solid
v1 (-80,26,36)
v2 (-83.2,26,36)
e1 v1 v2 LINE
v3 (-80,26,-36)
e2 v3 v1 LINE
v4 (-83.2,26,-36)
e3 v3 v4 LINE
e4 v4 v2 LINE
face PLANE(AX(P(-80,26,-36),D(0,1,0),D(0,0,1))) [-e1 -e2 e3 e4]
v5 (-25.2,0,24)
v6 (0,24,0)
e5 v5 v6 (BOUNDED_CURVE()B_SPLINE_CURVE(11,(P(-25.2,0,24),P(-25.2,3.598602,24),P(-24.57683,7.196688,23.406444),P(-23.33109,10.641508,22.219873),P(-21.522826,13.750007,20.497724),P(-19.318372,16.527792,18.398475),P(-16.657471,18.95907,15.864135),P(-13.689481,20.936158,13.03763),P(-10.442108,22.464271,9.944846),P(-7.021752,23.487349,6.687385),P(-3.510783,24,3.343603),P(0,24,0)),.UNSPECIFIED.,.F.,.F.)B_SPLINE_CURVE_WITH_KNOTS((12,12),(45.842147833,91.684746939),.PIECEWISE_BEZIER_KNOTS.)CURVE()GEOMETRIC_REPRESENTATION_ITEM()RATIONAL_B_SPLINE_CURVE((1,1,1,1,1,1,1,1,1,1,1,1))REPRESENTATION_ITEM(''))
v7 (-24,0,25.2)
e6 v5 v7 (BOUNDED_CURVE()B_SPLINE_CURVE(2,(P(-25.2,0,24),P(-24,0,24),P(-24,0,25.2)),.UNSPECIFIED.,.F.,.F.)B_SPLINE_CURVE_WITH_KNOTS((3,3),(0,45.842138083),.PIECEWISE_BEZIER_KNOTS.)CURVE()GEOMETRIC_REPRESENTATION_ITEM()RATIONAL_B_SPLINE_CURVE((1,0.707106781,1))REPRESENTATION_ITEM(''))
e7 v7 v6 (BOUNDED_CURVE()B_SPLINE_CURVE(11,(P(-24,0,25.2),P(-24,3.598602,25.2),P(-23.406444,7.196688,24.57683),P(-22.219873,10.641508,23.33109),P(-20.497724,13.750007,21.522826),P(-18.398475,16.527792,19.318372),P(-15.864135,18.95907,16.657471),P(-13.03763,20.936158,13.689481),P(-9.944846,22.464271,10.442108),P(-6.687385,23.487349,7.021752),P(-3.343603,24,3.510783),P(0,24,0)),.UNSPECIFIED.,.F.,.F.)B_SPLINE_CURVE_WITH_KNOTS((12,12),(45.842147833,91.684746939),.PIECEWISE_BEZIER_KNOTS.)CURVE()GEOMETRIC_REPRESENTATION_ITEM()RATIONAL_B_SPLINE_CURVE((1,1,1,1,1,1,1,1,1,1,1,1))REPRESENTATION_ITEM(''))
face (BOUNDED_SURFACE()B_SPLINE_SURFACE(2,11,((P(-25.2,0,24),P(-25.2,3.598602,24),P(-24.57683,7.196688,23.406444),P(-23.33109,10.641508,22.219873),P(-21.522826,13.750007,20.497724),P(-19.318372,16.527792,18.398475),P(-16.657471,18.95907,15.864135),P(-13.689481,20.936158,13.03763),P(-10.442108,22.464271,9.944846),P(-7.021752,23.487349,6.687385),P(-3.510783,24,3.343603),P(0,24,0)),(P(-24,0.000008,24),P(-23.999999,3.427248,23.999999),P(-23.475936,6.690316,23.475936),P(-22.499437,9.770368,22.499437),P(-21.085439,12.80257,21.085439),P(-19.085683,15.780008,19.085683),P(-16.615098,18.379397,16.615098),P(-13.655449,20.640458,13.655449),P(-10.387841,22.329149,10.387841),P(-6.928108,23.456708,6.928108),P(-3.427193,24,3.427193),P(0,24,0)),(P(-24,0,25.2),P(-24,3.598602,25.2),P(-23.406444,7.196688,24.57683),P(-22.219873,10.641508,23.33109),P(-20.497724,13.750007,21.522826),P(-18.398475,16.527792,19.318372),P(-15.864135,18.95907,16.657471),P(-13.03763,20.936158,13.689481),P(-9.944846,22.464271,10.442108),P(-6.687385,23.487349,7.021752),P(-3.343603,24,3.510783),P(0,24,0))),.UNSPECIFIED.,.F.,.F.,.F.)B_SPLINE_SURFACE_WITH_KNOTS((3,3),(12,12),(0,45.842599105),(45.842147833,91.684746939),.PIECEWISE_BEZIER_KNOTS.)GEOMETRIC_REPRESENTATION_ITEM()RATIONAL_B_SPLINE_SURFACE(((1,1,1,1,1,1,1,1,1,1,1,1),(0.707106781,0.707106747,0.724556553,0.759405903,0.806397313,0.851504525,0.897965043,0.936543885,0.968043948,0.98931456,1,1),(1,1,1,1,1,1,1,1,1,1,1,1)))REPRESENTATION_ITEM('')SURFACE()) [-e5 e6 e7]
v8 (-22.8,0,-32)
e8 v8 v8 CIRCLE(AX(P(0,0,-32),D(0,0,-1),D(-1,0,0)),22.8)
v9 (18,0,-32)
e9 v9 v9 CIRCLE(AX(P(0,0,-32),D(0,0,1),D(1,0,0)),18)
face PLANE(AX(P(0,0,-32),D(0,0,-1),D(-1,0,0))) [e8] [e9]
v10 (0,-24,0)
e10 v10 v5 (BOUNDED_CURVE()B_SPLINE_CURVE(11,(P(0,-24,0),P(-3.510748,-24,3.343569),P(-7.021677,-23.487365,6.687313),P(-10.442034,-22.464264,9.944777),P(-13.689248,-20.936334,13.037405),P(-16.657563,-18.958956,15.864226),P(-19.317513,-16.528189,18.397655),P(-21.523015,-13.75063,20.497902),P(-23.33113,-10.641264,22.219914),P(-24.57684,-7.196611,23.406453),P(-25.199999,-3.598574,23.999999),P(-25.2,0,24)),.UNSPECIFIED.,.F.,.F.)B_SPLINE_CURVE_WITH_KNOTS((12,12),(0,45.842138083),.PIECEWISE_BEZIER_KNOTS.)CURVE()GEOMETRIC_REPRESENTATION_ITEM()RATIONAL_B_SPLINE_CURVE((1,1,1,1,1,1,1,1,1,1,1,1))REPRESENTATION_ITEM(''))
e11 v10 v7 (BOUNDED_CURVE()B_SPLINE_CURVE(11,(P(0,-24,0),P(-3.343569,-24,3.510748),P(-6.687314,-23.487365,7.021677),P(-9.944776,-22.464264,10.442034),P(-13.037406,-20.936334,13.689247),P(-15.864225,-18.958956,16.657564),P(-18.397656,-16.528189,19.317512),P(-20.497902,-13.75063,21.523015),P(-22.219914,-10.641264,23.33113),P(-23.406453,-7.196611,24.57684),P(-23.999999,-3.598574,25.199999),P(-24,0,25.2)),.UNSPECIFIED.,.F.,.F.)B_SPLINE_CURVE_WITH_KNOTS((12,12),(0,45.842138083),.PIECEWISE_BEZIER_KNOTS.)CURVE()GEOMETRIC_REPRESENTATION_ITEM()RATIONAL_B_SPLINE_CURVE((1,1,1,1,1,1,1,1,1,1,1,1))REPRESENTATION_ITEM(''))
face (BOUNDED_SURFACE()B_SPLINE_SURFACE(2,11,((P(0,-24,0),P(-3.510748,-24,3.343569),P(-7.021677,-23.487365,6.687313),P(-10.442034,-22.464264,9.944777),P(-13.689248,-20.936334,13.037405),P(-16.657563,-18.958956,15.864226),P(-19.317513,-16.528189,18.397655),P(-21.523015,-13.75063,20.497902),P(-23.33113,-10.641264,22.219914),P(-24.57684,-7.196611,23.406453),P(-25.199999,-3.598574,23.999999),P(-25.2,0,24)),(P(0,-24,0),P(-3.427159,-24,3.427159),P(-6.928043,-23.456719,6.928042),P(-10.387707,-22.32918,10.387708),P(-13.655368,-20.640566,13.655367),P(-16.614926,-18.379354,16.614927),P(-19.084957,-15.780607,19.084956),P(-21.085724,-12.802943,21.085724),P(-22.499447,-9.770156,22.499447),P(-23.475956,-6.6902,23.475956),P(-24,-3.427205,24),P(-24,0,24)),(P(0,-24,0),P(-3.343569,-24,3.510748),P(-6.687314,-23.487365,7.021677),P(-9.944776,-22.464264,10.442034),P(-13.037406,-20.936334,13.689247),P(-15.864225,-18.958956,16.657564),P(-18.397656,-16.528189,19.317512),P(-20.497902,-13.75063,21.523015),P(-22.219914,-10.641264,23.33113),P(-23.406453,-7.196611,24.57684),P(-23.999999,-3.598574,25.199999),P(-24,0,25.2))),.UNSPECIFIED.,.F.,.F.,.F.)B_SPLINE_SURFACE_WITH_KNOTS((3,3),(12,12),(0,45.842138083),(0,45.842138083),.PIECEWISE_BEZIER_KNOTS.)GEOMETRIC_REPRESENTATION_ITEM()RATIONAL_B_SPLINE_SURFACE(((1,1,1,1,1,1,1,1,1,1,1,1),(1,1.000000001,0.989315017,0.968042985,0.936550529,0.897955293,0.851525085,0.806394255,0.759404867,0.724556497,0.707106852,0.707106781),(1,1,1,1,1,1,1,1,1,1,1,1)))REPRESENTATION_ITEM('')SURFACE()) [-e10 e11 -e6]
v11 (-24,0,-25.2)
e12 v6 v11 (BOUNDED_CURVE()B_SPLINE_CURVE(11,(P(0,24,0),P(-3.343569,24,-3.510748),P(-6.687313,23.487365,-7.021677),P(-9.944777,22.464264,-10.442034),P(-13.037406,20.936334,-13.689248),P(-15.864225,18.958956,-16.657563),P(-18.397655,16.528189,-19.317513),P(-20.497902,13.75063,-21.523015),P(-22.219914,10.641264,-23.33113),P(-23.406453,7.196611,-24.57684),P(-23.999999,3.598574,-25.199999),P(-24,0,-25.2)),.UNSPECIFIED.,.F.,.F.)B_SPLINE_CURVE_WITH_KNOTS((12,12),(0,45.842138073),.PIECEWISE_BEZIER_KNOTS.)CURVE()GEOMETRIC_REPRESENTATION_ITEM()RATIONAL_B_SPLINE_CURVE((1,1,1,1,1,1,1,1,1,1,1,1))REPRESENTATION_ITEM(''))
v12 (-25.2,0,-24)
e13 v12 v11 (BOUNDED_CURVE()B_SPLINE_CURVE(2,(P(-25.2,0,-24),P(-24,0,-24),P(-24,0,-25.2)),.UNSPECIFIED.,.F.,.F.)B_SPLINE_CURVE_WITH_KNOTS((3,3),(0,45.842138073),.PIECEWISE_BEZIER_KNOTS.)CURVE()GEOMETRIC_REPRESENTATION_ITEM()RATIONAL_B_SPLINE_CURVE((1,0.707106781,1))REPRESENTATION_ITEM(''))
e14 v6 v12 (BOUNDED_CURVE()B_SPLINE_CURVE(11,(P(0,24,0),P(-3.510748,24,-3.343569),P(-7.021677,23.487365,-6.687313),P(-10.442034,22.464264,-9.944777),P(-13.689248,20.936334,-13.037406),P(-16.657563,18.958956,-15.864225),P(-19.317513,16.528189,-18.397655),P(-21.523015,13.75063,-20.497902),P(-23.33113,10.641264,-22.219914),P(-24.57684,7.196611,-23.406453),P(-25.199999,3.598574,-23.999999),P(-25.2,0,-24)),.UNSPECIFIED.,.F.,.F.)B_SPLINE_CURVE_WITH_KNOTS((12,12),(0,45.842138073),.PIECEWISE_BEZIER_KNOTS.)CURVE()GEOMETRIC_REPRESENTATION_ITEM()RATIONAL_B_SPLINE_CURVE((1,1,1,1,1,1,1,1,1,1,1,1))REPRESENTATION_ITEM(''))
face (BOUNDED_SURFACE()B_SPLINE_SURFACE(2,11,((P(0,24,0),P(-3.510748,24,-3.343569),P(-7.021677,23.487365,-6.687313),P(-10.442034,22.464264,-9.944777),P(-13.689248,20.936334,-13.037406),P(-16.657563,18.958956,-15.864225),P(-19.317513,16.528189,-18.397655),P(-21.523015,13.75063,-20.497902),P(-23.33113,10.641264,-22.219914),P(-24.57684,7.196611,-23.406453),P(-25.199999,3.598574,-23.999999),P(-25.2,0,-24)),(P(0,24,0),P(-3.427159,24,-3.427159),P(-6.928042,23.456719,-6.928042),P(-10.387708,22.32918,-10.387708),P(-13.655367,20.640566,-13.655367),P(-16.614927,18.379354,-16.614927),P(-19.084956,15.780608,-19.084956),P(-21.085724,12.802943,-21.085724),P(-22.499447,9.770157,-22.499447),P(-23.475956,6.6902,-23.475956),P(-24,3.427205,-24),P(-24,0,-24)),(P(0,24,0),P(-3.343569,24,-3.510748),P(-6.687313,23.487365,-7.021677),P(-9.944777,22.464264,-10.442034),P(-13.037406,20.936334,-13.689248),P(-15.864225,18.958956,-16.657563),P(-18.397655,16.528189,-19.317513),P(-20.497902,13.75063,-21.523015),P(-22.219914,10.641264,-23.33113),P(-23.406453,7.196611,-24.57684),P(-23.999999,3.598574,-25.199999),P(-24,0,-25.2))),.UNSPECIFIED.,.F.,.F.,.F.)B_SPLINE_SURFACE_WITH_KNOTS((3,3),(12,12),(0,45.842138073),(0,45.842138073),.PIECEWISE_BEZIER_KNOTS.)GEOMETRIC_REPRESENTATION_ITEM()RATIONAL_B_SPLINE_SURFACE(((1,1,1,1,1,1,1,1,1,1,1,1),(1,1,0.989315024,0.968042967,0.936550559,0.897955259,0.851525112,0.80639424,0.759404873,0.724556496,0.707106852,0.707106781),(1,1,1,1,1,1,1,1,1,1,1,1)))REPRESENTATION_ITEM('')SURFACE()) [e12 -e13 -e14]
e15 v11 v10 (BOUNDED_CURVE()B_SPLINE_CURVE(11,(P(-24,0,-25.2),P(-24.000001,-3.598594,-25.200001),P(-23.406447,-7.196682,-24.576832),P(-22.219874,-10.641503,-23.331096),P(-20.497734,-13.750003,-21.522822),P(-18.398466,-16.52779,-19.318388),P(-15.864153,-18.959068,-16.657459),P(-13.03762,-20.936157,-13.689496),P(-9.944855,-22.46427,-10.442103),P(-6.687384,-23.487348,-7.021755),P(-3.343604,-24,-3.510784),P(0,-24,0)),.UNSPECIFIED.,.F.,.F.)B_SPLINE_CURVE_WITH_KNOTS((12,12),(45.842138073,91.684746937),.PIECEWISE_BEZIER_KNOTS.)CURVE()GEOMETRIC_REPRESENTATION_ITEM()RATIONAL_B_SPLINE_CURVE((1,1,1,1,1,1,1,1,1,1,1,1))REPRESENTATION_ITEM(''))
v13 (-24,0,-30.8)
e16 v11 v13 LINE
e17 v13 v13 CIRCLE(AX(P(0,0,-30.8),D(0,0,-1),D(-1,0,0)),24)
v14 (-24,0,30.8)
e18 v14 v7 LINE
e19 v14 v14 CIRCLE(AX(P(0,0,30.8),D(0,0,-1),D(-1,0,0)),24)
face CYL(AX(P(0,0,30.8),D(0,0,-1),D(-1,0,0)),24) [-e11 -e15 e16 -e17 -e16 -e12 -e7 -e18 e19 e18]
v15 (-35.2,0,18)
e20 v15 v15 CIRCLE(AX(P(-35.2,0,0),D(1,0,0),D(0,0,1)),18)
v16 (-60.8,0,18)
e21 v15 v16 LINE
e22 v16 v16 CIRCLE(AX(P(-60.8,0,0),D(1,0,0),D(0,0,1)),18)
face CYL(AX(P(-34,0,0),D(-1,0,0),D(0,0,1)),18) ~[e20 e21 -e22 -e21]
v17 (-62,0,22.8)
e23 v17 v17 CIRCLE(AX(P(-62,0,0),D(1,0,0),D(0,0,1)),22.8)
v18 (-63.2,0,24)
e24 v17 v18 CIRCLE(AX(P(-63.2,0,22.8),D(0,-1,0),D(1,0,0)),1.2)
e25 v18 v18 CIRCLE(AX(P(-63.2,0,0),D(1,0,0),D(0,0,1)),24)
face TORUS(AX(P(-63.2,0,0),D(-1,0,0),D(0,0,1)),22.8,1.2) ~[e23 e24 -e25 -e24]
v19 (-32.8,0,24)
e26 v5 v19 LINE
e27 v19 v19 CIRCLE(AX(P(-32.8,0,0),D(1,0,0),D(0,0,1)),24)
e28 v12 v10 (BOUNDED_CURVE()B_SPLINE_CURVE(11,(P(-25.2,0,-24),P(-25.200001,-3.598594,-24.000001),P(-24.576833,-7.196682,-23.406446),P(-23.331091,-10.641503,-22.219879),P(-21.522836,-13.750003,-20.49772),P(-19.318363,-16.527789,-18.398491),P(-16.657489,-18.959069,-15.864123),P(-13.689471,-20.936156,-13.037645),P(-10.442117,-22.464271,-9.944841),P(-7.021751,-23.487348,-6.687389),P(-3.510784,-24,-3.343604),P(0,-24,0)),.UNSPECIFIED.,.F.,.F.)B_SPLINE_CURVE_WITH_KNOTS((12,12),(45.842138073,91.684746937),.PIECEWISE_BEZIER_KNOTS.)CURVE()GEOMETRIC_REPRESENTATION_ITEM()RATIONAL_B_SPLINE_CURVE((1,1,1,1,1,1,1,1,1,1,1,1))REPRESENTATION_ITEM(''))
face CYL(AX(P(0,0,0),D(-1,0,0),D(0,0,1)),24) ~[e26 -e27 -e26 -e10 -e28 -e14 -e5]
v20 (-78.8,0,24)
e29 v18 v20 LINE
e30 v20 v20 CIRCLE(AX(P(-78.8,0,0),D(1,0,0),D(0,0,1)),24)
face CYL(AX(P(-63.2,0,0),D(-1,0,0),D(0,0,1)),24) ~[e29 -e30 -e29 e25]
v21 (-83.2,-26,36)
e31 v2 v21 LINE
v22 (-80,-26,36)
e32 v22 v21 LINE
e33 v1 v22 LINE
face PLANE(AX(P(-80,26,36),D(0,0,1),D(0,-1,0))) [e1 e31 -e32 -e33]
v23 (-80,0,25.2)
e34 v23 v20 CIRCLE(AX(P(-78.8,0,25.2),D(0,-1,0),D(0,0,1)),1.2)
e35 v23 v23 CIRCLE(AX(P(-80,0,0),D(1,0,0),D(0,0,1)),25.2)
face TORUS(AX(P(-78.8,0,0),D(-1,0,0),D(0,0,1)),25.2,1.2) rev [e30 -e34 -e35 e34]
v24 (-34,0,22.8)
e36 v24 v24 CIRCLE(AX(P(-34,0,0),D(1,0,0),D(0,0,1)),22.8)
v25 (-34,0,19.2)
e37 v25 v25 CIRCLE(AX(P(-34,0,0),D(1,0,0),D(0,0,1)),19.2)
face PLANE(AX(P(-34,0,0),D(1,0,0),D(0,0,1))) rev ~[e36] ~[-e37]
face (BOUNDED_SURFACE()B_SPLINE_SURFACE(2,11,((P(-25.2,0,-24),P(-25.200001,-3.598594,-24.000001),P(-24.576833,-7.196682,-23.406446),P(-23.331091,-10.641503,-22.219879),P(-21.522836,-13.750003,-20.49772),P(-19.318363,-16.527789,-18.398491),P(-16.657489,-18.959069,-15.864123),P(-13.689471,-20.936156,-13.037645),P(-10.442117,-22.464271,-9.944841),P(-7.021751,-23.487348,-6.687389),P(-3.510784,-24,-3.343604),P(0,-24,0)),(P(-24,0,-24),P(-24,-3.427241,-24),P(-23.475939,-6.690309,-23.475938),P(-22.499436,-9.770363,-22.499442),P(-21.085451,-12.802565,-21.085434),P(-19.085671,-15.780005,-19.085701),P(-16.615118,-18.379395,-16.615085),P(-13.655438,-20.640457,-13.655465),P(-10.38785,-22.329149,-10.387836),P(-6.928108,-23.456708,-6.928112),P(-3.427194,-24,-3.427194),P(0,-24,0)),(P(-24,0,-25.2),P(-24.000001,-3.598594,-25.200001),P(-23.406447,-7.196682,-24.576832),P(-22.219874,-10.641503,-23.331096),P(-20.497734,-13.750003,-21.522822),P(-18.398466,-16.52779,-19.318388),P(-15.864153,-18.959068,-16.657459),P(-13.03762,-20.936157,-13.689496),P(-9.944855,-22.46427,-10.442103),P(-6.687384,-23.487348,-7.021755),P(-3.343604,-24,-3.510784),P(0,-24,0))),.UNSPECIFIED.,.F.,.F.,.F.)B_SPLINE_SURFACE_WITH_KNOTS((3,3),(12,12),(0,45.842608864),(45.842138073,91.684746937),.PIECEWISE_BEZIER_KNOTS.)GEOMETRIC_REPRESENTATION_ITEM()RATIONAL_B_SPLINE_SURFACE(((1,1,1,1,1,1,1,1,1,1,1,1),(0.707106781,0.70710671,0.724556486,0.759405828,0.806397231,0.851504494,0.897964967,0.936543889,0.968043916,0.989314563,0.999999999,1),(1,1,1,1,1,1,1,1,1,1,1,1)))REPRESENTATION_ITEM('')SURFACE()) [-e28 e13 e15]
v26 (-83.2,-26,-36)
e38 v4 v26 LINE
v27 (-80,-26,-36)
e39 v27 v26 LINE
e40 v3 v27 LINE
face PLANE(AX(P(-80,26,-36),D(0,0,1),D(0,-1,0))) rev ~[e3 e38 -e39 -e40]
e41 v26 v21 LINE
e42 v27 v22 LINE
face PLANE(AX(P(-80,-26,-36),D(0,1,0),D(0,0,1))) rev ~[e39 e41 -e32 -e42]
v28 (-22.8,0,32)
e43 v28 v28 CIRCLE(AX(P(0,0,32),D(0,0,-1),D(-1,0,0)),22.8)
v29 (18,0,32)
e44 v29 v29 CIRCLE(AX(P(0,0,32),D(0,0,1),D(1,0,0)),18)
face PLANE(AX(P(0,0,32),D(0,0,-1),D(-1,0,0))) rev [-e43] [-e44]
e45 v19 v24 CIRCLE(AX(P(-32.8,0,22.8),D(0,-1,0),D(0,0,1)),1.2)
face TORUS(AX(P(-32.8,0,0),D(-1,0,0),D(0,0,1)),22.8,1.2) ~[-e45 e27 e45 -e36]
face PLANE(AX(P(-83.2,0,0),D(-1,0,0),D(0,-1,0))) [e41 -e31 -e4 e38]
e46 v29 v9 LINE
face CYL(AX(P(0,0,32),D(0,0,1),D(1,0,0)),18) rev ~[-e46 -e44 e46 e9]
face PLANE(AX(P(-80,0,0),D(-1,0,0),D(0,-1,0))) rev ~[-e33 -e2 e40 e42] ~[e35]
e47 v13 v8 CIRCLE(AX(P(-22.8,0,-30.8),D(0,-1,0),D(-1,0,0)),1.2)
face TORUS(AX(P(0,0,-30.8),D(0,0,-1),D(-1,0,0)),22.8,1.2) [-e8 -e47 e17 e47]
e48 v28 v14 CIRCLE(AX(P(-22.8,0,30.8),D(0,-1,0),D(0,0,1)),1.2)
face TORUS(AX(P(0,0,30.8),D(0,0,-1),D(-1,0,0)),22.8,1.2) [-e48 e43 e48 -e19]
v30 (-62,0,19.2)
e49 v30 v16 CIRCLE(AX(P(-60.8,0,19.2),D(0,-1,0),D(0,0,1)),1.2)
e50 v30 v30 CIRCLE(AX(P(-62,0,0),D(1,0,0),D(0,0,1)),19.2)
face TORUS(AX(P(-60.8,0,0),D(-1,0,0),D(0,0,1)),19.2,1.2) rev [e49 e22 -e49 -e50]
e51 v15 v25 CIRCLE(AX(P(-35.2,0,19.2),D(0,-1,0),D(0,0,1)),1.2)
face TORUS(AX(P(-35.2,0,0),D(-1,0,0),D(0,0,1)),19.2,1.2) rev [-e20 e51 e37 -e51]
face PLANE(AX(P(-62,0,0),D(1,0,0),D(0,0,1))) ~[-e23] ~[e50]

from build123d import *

# Parameters (mm, degrees)
F4_W     = 52
F4_H     = 72
F5_DEPTH = 3.2
F6_F1_R  = 1.2
F6_F2_R  = 1.2
F6_F3_R  = 1.2
F6_F4_R  = 1.2
F6_F5_R  = 1.2
F7_R     = 18
F8_DEPTH = 68.001


with BuildPart() as f1:
    # F0 (on Front) → F1 (revolve)
    with BuildSketch(Plane.XZ):
        with BuildLine():
            Line((-63.2, 24), (-80, 24))
            Line((-80, 24), (-80, 0))
            Line((-80, 0), (0, 0))
            Line((0, 0), (0, 24))
            Line((0, 24), (-32.8, 24))
            ThreePointArc((-32.8, 24), (-33.6485281374, 23.6485281374), (-34, 22.8))
            Line((-34, 22.8), (-34, 18))
            Line((-34, 18), (-62, 18))
            Line((-62, 18), (-62, 22.8))
            ThreePointArc((-62, 22.8), (-62.3514718626, 23.6485281374), (-63.2, 24))
        make_face()
    revolve(axis=Axis((-40, 0, 0), (1, 0, 0)))

    # F2 (on Front) → F3 (revolve)
    with BuildSketch(Plane.XZ):
        with BuildLine():
            Line((0, 32), (-22.8, 32))
            ThreePointArc((-22.8, 32), (-23.6485281374, 31.6485281374), (-24, 30.8))
            Line((-24, 30.8), (-24, -30.8))
            ThreePointArc((-24, -30.8), (-23.6485281374, -31.6485281374), (-22.8, -32))
            Line((-22.8, -32), (0, -32))
            Line((0, -32), (0, 32))
        make_face()
    revolve(axis=Axis((0, 0, 0), (0, 0, -1)))

    # F4 (on face) → F5 (join)
    with BuildSketch(Plane(origin=(-80, 0, 0), x_dir=(0, -1, 0), z_dir=(-1, 0, 0))):
        Rectangle(F4_W, F4_H)
    extrude(amount=F5_DEPTH)

    # F6: fillet of radius 1.2 on 7 edges, made by hand

    # F6_f1
    f6_f1_edges = [f1.edges().sort_by_distance(p)[0] for p in [
        (-80, 0, -24),
    ]]
    fillet(f6_f1_edges, radius=F6_F1_R)

    # F6_f2
    f6_f2_edges = [f1.edges().sort_by_distance(p)[0] for p in [
        (-62, 0, -18),
    ]]
    fillet(f6_f2_edges, radius=F6_F2_R)

    # F6_f3
    f6_f3_edges = [f1.edges().sort_by_distance(p)[0] for p in [
        (-34, 0, -18),
    ]]
    fillet(f6_f3_edges, radius=F6_F3_R)

    # F6_f4
    f6_f4_edges = [f1.edges().sort_by_distance(p)[0] for p in [
        (-16.9705627499, -16.9705627471, 16.9705627499),
        (-16.9705627485, 16.9705627485, 16.9705627485),
    ]]
    fillet(f6_f4_edges, radius=F6_F4_R)

    # F6_f5
    f6_f5_edges = [f1.edges().sort_by_distance(p)[0] for p in [
        (-16.9705627499, 16.9705627471, -16.9705627499),
        (-16.9705627485, -16.9705627485, -16.9705627485),
    ]]
    fillet(f6_f5_edges, radius=F6_F5_R)

    # F7 (on face) → F8 (cut, through all)
    with BuildSketch(Plane.XY.offset(32)):
        Circle(F7_R)
    extrude(amount=-F8_DEPTH, mode=Mode.SUBTRACT)


solid = f1.part
